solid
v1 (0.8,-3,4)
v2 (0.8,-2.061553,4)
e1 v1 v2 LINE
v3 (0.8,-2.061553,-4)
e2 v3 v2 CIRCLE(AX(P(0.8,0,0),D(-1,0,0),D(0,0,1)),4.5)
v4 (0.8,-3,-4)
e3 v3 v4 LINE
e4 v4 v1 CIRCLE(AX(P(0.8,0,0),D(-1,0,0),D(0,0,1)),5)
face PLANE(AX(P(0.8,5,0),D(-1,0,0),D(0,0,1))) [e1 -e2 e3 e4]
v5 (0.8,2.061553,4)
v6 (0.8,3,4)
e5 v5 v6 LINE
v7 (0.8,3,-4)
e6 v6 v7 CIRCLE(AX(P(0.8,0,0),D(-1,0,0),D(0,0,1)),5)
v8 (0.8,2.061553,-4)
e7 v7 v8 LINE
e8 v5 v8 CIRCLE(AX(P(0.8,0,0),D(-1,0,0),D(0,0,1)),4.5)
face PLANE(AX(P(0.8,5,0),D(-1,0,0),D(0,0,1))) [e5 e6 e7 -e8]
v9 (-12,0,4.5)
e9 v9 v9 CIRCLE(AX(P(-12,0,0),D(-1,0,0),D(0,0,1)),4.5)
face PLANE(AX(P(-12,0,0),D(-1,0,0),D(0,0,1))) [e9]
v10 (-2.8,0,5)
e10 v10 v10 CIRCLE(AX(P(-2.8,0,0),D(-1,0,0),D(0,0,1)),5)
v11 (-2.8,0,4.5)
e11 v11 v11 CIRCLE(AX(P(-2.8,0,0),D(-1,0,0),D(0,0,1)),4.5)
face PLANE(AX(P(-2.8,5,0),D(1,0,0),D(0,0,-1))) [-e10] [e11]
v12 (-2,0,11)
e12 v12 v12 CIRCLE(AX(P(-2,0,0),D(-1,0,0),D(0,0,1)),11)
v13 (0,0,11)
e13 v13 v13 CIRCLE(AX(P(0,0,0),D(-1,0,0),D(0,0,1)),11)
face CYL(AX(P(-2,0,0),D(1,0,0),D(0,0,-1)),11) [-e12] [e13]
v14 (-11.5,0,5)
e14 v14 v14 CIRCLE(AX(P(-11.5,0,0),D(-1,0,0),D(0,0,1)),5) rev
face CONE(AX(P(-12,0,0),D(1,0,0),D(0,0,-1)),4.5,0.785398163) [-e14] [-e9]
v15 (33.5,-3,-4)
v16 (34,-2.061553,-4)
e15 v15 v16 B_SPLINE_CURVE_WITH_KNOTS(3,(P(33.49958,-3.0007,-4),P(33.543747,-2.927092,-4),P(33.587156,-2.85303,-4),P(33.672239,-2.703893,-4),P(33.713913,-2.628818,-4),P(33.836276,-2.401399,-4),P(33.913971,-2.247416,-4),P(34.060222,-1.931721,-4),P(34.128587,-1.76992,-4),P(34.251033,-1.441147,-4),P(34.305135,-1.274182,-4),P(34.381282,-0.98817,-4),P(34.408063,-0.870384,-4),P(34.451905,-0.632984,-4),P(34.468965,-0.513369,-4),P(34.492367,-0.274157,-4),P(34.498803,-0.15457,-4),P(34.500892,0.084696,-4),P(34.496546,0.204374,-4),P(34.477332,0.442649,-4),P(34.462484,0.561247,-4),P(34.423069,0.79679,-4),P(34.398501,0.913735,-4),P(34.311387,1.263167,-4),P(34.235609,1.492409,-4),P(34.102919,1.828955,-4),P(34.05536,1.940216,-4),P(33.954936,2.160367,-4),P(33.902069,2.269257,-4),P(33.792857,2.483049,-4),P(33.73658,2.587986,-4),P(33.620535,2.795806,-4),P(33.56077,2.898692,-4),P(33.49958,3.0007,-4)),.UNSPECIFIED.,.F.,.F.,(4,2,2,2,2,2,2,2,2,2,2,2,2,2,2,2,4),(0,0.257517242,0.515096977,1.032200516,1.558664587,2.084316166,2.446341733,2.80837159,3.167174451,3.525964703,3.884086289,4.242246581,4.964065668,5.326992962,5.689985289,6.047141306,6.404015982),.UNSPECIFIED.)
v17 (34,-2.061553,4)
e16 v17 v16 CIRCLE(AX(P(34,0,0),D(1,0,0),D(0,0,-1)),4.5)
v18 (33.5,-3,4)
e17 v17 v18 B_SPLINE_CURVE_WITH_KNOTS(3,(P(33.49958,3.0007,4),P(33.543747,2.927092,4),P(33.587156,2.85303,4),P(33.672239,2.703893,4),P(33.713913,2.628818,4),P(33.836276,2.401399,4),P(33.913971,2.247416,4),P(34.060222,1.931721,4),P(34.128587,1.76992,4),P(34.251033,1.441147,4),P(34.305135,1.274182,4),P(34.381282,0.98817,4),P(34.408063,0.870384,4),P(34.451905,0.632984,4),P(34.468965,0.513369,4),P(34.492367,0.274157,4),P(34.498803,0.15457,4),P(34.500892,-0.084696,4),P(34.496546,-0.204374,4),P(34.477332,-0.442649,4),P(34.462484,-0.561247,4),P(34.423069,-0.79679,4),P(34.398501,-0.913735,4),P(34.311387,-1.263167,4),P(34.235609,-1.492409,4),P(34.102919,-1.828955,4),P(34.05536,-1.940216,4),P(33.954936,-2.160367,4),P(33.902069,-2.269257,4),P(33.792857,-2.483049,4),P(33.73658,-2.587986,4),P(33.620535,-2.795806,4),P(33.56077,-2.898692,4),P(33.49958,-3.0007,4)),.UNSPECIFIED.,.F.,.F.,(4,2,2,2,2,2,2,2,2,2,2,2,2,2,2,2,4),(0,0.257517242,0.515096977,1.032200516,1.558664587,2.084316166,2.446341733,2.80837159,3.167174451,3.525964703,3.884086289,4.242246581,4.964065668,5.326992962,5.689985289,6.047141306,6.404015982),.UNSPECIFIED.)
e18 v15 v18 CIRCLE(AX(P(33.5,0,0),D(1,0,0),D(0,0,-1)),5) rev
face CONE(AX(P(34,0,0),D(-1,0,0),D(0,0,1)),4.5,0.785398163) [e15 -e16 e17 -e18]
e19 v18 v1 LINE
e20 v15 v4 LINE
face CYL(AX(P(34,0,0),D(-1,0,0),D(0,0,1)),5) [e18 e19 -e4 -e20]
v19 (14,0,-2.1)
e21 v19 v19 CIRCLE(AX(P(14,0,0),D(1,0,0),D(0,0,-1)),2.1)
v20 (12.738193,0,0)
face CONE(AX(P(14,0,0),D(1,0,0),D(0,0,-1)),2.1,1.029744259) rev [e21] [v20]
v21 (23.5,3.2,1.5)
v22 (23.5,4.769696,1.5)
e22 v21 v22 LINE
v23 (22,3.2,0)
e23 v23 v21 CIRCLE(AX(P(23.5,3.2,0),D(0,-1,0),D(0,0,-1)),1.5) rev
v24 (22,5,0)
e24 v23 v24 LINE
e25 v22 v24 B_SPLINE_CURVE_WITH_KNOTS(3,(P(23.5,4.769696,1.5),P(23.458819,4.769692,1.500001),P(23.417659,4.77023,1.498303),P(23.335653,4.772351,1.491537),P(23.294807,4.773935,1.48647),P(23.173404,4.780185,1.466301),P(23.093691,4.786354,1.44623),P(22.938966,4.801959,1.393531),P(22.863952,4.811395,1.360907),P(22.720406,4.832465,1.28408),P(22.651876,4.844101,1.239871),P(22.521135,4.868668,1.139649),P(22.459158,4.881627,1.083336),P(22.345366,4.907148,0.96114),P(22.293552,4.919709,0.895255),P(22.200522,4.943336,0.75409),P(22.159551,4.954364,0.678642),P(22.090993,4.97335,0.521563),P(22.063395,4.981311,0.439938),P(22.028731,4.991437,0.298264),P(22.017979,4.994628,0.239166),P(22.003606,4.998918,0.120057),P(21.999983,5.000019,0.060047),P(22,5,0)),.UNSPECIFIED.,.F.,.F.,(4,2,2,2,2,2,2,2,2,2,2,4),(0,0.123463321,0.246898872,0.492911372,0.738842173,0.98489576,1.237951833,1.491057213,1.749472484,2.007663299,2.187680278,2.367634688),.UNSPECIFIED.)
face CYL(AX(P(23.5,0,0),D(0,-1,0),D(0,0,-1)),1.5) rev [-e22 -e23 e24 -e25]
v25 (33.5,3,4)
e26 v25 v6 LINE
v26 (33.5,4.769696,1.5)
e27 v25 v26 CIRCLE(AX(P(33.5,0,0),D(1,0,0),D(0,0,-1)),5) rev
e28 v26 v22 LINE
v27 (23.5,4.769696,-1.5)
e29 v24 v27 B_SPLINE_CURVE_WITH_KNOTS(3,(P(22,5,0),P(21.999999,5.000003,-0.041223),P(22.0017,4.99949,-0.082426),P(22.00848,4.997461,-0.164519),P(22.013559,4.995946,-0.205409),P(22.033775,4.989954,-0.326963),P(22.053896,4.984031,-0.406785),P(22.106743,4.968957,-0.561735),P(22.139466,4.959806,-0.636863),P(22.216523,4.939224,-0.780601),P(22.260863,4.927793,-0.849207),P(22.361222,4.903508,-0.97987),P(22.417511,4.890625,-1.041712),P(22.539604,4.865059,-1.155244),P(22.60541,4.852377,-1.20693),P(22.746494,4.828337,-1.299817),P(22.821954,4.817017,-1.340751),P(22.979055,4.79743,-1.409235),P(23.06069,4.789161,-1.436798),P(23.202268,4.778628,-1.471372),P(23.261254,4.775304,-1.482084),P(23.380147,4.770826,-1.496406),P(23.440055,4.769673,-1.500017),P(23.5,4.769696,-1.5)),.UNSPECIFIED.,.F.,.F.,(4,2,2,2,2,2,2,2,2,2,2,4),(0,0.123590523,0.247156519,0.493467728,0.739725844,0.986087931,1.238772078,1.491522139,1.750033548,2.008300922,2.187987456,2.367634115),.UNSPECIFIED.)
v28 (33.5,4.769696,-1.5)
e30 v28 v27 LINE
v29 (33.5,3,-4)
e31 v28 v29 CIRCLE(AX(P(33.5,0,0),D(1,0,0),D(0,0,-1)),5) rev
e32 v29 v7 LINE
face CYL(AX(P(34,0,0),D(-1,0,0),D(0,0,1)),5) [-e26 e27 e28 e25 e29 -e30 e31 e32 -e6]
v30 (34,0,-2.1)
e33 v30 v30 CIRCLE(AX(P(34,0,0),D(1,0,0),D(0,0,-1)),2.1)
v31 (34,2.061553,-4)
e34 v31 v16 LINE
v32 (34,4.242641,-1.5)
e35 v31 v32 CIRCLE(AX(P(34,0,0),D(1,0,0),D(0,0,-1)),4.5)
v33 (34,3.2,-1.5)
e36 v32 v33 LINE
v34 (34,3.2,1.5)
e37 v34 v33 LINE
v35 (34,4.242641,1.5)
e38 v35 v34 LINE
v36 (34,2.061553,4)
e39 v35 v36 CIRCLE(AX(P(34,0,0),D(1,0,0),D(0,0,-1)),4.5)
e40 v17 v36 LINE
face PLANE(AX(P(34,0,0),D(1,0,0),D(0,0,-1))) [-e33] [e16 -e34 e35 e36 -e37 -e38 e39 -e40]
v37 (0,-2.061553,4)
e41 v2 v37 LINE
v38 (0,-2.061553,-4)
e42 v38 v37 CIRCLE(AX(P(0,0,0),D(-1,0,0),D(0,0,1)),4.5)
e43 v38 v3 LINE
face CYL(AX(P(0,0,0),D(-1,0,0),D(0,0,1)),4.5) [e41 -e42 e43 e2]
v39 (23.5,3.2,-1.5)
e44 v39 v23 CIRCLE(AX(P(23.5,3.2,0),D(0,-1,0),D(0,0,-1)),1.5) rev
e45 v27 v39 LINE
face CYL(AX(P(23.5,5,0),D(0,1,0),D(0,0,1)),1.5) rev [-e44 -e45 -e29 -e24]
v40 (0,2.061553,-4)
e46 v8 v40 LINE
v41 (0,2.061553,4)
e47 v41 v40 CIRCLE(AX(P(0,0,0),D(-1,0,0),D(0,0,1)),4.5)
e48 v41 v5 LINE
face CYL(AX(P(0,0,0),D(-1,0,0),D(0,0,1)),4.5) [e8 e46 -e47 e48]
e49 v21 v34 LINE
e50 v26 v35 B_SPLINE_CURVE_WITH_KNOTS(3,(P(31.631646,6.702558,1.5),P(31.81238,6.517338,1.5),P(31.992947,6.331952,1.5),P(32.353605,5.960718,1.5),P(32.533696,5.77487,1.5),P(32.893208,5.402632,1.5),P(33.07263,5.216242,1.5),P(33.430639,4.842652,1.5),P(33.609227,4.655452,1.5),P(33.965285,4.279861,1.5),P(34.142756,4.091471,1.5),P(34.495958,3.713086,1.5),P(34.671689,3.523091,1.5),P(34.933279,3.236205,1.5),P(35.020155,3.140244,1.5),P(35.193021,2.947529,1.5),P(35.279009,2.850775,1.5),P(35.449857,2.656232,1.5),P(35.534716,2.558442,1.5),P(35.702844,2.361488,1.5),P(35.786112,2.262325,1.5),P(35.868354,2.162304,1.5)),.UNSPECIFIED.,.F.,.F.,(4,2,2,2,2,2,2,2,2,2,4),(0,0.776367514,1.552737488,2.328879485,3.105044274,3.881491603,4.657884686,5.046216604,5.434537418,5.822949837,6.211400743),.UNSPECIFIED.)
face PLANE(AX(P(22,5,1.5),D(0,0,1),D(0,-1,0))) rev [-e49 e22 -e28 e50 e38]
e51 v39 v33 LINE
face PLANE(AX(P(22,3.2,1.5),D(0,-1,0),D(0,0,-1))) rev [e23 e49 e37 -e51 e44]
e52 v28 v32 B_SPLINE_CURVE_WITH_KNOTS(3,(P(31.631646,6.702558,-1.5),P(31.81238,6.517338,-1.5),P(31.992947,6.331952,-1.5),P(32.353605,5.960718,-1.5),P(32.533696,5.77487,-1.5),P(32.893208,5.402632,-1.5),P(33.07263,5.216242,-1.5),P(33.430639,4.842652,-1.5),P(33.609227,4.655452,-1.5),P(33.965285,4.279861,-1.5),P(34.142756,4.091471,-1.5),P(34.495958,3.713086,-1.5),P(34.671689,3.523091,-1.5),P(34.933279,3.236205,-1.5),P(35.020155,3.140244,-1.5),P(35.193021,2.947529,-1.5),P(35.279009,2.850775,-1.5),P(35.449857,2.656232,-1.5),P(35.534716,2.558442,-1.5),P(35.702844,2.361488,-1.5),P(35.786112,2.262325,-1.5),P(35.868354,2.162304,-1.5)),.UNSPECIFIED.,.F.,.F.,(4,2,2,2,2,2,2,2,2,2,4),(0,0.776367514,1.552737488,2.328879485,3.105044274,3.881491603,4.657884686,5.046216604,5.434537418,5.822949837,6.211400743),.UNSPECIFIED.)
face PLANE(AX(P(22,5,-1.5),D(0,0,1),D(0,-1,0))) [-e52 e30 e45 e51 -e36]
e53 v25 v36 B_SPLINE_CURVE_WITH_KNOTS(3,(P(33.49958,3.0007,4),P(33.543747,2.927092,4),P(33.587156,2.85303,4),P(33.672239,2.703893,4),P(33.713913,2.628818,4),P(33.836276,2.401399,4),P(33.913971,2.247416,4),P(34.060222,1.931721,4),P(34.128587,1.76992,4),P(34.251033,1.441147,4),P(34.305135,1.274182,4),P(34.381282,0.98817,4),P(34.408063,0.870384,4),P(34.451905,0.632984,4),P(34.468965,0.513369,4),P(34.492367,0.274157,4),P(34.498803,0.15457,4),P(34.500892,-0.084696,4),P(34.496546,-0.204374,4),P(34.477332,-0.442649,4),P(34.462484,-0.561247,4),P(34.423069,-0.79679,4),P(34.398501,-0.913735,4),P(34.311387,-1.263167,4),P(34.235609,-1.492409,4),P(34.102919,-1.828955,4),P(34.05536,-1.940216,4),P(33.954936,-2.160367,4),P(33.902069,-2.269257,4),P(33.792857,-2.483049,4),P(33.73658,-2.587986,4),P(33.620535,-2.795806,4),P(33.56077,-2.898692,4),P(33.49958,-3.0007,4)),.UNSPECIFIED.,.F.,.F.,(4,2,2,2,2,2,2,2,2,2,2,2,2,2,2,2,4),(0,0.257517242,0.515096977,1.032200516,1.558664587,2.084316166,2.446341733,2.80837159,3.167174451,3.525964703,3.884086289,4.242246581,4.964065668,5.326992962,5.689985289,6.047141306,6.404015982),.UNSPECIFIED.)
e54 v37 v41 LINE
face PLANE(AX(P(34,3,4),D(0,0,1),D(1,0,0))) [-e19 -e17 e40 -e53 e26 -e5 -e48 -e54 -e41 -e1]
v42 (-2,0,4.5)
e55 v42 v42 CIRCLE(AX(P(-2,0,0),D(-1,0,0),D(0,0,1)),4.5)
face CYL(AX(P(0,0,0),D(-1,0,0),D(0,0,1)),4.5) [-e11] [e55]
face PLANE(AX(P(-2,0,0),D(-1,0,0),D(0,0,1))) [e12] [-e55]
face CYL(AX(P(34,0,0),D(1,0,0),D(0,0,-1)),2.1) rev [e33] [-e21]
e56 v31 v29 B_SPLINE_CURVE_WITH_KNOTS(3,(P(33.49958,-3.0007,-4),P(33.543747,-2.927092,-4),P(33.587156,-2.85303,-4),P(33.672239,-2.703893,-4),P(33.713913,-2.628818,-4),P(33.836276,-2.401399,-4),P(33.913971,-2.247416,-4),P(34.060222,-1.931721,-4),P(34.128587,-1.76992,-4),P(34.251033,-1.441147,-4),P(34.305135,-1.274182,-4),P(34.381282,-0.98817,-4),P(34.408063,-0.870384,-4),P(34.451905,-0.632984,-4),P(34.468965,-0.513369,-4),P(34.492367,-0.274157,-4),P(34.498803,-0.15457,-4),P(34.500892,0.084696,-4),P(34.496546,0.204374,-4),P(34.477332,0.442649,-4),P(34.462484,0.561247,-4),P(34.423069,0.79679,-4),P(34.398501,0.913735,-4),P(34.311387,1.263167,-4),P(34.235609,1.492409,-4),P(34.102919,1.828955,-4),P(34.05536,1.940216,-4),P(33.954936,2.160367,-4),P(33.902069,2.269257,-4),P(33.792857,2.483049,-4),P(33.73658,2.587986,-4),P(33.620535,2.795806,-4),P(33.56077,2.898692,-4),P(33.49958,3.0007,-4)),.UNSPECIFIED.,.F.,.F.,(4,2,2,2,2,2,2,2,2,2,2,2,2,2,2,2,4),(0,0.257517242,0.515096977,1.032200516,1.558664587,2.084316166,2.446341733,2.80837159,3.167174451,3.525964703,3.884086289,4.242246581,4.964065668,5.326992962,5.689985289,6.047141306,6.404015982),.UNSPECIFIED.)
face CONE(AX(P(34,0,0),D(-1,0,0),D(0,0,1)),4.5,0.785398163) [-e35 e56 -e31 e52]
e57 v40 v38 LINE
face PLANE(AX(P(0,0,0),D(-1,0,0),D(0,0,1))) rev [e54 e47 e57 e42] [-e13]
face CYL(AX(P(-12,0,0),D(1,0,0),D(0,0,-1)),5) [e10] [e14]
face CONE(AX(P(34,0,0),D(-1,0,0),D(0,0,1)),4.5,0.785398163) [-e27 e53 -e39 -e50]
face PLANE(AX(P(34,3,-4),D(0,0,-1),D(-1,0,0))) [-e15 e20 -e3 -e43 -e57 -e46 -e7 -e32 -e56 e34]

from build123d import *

# Parameters (mm, degrees)
SKETCH1_R                        = 5
BOSS_EXTRUDE1_DEPTH              = 34
CHAMFER1_SIZE                    = 0.5
SKETCH2_R                        = 11
BOSS_EXTRUDE2_DEPTH              = 2
SKETCH3_W                        = 3
SKETCH3_H                        = 1.8
CUT_EXTRUDE1_DEPTH               = 12
FILLET1_R                        = 1.5
BOSS_EXTRUDE3_START              = 10
SKETCH4_R                        = 5
BOSS_EXTRUDE3_DEPTH              = 10
SKETCH6_W                        = 0.8
SKETCH6_H                        = 0.5
CHAMFER2_SIZE                    = 0.5
CUT_EXTRUDE2_DEPTH               = 38.389838192
TAP_DRILL_FOR_M4_HELICOIL1_D     = 4.2
TAP_DRILL_FOR_M4_HELICOIL1_DEPTH = 20
TAP_DRILL_FOR_M4_HELICOIL1_TIP   = 1.2618073


with BuildPart() as part:
    # Sketch1 → Boss-Extrude1 (new body)
    with BuildSketch(Plane(origin=(0, 0, 0), x_dir=(0, 0, -1), z_dir=(1, 0, 0))):
        Circle(SKETCH1_R)
    extrude(amount=BOSS_EXTRUDE1_DEPTH)

    # Chamfer1
    chamfer1_edges = [part.edges().sort_by_distance(p)[0] for p in [
        (34, 0, 5),
    ]]
    chamfer(chamfer1_edges, length=CHAMFER1_SIZE)

    # Sketch2 → Boss-Extrude2 (add)
    with BuildSketch(Plane.ZY):
        Circle(SKETCH2_R)
    extrude(amount=BOSS_EXTRUDE2_DEPTH)

    # Sketch3 → Cut-Extrude1 (cut)
    with BuildSketch(Plane(origin=(34, 0, 0), x_dir=(0, 0, -1), z_dir=(1, 0, 0))):
        with Locations((0, 4.1)):
            Rectangle(SKETCH3_W, SKETCH3_H)
    extrude(amount=-CUT_EXTRUDE1_DEPTH, mode=Mode.SUBTRACT)

    # Fillet1
    fillet1_edges = [part.edges().sort_by_distance(p)[0] for p in [
        (22, 3.984848004, 1.5),
        (22, 3.984848004, -1.5),
    ]]
    fillet(fillet1_edges, radius=FILLET1_R - 0.0001)  # a hair under: the kernel refuses the full size

    # Sketch4 → Boss-Extrude3 (add)
    with BuildSketch(Plane.ZY.offset(2).offset(BOSS_EXTRUDE3_START)):
        with Locations(Location((0, 0, 0), (0, 0, 72.542396876))):
            Circle(SKETCH4_R)
    extrude(amount=-BOSS_EXTRUDE3_DEPTH)

    # Sketch6 → Cut-Revolve1 (revolve, cut)
    with BuildSketch(Plane.XY, mode=Mode.PRIVATE) as cut_revolve1_sk:
        with Locations((-2.4, 4.75)):
            Rectangle(SKETCH6_W, SKETCH6_H)
        with Locations((0.4, 4.75)):
            Rectangle(SKETCH6_W, SKETCH6_H)
    revolve(cut_revolve1_sk.sketch.rotate(Axis((0, 0, 0), (1, 0, 0)), 90), axis=Axis((0, 0, 0), (1, 0, 0)), mode=Mode.SUBTRACT)

    # Chamfer2
    chamfer2_edges = [part.edges().sort_by_distance(p)[0] for p in [
        (-12, -4.769696007, -1.5),
    ]]
    chamfer(chamfer2_edges, length=CHAMFER2_SIZE)

    # Sketch7 → Cut-Extrude2 (cut, through all)
    with BuildSketch(Plane(origin=(0, 0, 0), x_dir=(0, 0, -1), z_dir=(1, 0, 0))):
        with BuildLine():
            Line((-4, 3), (-4, -3))
            ThreePointArc((-4, -3), (-5, 0), (-4, 3))
        make_face()
        with BuildLine():
            Line((4, 3), (4, -3))
            ThreePointArc((4, -3), (5, 0), (4, 3))
        make_face()
    extrude(amount=CUT_EXTRUDE2_DEPTH, mode=Mode.SUBTRACT)

    # Tap Drill for M4 Helicoil1
    with Locations(Plane(origin=(34, 0, 0), x_dir=(0, 0, -1), z_dir=(1, 0, 0))):
        with Locations((0, 0)):
            Hole(TAP_DRILL_FOR_M4_HELICOIL1_D / 2, depth=TAP_DRILL_FOR_M4_HELICOIL1_DEPTH)
            with Locations((0, 0, -(TAP_DRILL_FOR_M4_HELICOIL1_DEPTH + TAP_DRILL_FOR_M4_HELICOIL1_TIP / 2))):  # 118° drill point
                Cone(0, TAP_DRILL_FOR_M4_HELICOIL1_D / 2, TAP_DRILL_FOR_M4_HELICOIL1_TIP, mode=Mode.SUBTRACT)


solid = part.part
